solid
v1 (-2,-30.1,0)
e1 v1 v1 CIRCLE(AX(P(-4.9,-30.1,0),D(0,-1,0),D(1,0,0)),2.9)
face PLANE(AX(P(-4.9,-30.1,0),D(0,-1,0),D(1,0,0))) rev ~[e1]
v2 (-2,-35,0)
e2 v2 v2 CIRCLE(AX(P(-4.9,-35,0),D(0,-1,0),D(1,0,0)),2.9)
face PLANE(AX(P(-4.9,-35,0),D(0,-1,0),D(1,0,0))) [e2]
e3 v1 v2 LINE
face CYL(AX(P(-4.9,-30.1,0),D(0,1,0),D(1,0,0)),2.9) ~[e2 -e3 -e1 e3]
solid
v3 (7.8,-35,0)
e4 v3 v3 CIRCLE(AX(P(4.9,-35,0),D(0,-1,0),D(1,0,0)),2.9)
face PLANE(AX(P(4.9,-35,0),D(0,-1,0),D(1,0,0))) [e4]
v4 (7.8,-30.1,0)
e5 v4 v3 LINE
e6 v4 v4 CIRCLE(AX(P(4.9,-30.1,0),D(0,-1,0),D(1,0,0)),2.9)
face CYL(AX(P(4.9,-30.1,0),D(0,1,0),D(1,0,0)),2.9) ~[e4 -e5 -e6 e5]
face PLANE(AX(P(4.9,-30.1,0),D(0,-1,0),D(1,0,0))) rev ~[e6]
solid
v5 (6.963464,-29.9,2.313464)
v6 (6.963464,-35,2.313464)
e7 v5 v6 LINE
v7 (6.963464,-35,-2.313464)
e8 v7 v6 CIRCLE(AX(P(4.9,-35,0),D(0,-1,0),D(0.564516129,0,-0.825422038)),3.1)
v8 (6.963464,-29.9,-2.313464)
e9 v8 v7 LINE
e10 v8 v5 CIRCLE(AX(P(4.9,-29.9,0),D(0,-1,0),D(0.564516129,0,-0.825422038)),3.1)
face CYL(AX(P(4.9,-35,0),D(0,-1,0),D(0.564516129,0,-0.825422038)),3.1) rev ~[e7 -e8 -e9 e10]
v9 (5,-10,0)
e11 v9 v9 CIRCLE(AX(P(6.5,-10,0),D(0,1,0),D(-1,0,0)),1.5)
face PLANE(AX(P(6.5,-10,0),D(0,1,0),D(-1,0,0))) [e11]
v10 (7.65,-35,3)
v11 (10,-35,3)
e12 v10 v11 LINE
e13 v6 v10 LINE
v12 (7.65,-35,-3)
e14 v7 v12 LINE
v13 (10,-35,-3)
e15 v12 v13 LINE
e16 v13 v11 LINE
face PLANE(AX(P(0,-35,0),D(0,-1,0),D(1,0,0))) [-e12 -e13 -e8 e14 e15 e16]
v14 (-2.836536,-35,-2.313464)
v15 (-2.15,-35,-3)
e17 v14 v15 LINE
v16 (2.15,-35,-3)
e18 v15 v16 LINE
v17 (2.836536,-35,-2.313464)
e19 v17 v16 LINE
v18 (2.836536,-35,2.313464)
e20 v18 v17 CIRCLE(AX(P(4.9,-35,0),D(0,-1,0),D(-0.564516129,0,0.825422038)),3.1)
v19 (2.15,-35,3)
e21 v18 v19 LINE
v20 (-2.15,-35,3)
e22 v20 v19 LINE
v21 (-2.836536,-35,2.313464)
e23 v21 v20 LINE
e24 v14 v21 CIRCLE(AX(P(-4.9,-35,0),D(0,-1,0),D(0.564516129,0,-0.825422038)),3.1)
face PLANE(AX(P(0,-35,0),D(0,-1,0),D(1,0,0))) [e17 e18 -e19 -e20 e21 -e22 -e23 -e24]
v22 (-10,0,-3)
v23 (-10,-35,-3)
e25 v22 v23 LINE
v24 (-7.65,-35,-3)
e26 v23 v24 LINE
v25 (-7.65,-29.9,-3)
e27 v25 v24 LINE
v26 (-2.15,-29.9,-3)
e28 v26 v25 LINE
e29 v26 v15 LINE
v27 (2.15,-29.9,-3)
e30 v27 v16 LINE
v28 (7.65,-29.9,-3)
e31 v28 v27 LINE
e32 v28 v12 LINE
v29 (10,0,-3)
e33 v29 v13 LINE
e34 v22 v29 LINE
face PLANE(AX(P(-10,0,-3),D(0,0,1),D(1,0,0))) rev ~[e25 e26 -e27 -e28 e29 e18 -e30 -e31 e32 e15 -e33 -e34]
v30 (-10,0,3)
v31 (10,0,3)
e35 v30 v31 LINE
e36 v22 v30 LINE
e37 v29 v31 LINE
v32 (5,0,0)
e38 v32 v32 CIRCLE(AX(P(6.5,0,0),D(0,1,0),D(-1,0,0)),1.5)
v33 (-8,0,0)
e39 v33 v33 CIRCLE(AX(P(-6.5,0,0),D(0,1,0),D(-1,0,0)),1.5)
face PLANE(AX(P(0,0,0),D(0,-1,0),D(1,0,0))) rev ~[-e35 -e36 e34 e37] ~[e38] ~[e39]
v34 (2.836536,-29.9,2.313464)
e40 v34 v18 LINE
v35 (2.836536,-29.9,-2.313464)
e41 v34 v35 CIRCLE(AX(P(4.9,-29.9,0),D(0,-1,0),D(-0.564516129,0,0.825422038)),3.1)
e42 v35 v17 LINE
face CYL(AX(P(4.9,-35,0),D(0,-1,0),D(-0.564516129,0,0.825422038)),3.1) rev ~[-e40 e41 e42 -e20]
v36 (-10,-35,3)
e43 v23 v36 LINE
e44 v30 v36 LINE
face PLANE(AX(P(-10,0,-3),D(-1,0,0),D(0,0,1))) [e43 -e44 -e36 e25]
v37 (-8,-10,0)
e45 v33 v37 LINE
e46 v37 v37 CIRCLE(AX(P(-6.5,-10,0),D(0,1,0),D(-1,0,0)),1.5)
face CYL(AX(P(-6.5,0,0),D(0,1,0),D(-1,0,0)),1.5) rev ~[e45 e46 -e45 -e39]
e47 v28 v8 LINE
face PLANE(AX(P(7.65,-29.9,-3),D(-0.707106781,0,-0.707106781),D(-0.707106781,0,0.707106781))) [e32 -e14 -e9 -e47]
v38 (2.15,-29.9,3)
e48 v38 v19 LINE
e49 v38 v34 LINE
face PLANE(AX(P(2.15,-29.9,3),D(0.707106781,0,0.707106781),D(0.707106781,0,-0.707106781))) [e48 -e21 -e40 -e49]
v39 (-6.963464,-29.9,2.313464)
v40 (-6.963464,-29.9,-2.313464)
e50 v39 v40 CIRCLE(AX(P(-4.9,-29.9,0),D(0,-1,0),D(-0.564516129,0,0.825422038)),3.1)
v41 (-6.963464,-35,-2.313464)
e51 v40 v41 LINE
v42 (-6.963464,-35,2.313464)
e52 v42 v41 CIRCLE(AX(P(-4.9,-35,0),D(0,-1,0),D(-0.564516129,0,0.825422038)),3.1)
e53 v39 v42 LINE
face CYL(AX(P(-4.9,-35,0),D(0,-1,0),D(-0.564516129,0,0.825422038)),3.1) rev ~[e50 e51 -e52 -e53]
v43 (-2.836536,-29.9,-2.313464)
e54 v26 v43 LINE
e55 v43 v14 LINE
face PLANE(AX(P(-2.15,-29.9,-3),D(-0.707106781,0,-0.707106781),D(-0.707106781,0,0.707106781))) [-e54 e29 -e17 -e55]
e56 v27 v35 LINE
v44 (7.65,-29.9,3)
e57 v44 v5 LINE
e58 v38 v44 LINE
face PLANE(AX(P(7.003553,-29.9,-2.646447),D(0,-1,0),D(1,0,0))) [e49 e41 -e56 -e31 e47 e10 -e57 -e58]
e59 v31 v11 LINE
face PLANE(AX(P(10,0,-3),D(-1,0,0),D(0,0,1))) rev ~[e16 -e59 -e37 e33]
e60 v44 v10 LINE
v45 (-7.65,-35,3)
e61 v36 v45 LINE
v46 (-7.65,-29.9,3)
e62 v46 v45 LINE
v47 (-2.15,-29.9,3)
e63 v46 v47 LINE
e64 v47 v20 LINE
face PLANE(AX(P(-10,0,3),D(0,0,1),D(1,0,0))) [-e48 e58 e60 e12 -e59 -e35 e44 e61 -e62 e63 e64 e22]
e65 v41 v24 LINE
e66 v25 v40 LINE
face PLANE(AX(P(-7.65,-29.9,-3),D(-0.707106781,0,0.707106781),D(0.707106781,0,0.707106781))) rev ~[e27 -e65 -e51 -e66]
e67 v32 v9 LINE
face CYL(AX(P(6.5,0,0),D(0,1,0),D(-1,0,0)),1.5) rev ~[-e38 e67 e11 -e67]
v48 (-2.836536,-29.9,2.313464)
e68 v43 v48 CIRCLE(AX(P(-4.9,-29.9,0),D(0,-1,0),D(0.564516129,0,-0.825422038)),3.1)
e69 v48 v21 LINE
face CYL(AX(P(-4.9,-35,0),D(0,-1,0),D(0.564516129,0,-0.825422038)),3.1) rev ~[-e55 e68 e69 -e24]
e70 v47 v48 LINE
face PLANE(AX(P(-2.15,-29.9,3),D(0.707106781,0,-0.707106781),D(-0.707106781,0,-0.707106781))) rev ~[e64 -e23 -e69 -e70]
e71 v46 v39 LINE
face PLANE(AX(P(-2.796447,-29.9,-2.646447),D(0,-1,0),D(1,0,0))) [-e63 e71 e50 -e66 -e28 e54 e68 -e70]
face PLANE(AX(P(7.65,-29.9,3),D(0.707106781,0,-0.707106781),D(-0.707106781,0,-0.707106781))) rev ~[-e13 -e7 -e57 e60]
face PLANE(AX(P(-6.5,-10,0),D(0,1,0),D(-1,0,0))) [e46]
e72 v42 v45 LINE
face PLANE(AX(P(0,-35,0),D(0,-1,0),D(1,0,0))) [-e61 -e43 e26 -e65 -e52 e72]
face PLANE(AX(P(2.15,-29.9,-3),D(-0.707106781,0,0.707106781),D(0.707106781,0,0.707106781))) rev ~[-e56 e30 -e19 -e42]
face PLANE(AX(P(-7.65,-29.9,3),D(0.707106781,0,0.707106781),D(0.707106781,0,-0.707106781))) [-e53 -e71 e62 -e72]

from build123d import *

# Parameters (mm, degrees)
F0_W        = 20
F0_H        = 6
F1_DEPTH    = 35
F3_DEPTH    = 5.1
F4_T1_DEPTH = 7.671682988
F7_R        = 2.9
F8_DEPTH    = 4.9
F5_R        = 1.5
F9_DEPTH    = 10


# Not quite as in the source:
# - a fillet or chamfer that OpenCascade refuses, or shapes differently, is made with other operations: its cross-section is extruded or revolved along the edge and cut away or added


with BuildPart() as f1:
    # F0 (on Front) → F1 (new body)
    with BuildSketch(Plane.XZ):
        Rectangle(F0_W, F0_H)
    extrude(amount=F1_DEPTH)

    # F2 (on face) → F3 (cut)
    with BuildSketch(Plane.XZ.offset(35)):
        with BuildLine():
            Line((-6.65, 3.1), (-6.65, 2.5588083164))
            ThreePointArc((-6.65, 2.5588083164), (-8, 0), (-6.65, -2.5588083164))
            Line((-6.65, -2.5588083164), (-6.65, -3.1))
            Line((-6.65, -3.1), (-3.15, -3.1))
            Line((-3.15, -3.1), (-3.15, -2.5588083164))
            ThreePointArc((-3.15, -2.5588083164), (-1.8, 0), (-3.15, 2.5588083164))
            Line((-3.15, 2.5588083164), (-3.15, 3.1))
            Line((-3.15, 3.1), (-6.65, 3.1))
        make_face()
        with BuildLine():
            Line((6.65, -3.1), (6.65, -2.5588083164))
            ThreePointArc((6.65, -2.5588083164), (8, 0), (6.65, 2.5588083164))
            Line((6.65, 2.5588083164), (6.65, 3.1))
            Line((6.65, 3.1), (3.15, 3.1))
            Line((3.15, 3.1), (3.15, 2.5588083164))
            ThreePointArc((3.15, 2.5588083164), (1.8, 0), (3.15, -2.5588083164))
            Line((3.15, -2.5588083164), (3.15, -3.1))
            Line((3.15, -3.1), (6.65, -3.1))
        make_face()
    extrude(amount=-F3_DEPTH, mode=Mode.SUBTRACT)

    # F4: chamfer of 1 on 8 edges, made by hand

    # F4_s2 → F4_t1 (cut)
    with BuildSketch(Plane.XZ.offset(29.9)):
        Polygon((-7.65, 3), (-6.65, 2), (-6.65, 3), align=None)
        Polygon((-2.15, 3), (-3.15, 2), (-3.15, 3), align=None)
        Polygon((2.15, 3), (3.15, 2), (3.15, 3), align=None)
        Polygon((7.65, 3), (6.65, 2), (6.65, 3), align=None)
        Polygon((-7.65, -3), (-6.65, -2), (-6.65, -3), align=None)
        Polygon((-2.15, -3), (-3.15, -2), (-3.15, -3), align=None)
        Polygon((2.15, -3), (3.15, -2), (3.15, -3), align=None)
        Polygon((7.65, -3), (6.65, -2), (6.65, -3), align=None)
    extrude(amount=F4_T1_DEPTH, mode=Mode.SUBTRACT)

    # F5 (on face) → F9 (cut)
    with BuildSketch(Plane(origin=(0, 0, 0), x_dir=(-1, 0, 0), z_dir=(0, 1, 0))):
        with Locations((-6.5, 0)):
            Circle(F5_R)
        with Locations((6.5, 0)):
            Circle(F5_R)
    extrude(amount=-F9_DEPTH, mode=Mode.SUBTRACT)


with BuildPart() as f8:
    # F7 (on offset) → F8 (new body)
    with BuildSketch(Plane.XZ.offset(30.1)):
        with Locations((-4.9, 0)):
            Circle(F7_R)
    extrude(amount=F8_DEPTH)


with BuildPart() as f8b:
    # F7 (on offset) → F8, piece 2 (new body)
    with BuildSketch(Plane.XZ.offset(30.1)):
        with Locations((4.9, 0)):
            Circle(F7_R)
    extrude(amount=F8_DEPTH)


solid = Compound([f1.part, f8.part, f8b.part])
